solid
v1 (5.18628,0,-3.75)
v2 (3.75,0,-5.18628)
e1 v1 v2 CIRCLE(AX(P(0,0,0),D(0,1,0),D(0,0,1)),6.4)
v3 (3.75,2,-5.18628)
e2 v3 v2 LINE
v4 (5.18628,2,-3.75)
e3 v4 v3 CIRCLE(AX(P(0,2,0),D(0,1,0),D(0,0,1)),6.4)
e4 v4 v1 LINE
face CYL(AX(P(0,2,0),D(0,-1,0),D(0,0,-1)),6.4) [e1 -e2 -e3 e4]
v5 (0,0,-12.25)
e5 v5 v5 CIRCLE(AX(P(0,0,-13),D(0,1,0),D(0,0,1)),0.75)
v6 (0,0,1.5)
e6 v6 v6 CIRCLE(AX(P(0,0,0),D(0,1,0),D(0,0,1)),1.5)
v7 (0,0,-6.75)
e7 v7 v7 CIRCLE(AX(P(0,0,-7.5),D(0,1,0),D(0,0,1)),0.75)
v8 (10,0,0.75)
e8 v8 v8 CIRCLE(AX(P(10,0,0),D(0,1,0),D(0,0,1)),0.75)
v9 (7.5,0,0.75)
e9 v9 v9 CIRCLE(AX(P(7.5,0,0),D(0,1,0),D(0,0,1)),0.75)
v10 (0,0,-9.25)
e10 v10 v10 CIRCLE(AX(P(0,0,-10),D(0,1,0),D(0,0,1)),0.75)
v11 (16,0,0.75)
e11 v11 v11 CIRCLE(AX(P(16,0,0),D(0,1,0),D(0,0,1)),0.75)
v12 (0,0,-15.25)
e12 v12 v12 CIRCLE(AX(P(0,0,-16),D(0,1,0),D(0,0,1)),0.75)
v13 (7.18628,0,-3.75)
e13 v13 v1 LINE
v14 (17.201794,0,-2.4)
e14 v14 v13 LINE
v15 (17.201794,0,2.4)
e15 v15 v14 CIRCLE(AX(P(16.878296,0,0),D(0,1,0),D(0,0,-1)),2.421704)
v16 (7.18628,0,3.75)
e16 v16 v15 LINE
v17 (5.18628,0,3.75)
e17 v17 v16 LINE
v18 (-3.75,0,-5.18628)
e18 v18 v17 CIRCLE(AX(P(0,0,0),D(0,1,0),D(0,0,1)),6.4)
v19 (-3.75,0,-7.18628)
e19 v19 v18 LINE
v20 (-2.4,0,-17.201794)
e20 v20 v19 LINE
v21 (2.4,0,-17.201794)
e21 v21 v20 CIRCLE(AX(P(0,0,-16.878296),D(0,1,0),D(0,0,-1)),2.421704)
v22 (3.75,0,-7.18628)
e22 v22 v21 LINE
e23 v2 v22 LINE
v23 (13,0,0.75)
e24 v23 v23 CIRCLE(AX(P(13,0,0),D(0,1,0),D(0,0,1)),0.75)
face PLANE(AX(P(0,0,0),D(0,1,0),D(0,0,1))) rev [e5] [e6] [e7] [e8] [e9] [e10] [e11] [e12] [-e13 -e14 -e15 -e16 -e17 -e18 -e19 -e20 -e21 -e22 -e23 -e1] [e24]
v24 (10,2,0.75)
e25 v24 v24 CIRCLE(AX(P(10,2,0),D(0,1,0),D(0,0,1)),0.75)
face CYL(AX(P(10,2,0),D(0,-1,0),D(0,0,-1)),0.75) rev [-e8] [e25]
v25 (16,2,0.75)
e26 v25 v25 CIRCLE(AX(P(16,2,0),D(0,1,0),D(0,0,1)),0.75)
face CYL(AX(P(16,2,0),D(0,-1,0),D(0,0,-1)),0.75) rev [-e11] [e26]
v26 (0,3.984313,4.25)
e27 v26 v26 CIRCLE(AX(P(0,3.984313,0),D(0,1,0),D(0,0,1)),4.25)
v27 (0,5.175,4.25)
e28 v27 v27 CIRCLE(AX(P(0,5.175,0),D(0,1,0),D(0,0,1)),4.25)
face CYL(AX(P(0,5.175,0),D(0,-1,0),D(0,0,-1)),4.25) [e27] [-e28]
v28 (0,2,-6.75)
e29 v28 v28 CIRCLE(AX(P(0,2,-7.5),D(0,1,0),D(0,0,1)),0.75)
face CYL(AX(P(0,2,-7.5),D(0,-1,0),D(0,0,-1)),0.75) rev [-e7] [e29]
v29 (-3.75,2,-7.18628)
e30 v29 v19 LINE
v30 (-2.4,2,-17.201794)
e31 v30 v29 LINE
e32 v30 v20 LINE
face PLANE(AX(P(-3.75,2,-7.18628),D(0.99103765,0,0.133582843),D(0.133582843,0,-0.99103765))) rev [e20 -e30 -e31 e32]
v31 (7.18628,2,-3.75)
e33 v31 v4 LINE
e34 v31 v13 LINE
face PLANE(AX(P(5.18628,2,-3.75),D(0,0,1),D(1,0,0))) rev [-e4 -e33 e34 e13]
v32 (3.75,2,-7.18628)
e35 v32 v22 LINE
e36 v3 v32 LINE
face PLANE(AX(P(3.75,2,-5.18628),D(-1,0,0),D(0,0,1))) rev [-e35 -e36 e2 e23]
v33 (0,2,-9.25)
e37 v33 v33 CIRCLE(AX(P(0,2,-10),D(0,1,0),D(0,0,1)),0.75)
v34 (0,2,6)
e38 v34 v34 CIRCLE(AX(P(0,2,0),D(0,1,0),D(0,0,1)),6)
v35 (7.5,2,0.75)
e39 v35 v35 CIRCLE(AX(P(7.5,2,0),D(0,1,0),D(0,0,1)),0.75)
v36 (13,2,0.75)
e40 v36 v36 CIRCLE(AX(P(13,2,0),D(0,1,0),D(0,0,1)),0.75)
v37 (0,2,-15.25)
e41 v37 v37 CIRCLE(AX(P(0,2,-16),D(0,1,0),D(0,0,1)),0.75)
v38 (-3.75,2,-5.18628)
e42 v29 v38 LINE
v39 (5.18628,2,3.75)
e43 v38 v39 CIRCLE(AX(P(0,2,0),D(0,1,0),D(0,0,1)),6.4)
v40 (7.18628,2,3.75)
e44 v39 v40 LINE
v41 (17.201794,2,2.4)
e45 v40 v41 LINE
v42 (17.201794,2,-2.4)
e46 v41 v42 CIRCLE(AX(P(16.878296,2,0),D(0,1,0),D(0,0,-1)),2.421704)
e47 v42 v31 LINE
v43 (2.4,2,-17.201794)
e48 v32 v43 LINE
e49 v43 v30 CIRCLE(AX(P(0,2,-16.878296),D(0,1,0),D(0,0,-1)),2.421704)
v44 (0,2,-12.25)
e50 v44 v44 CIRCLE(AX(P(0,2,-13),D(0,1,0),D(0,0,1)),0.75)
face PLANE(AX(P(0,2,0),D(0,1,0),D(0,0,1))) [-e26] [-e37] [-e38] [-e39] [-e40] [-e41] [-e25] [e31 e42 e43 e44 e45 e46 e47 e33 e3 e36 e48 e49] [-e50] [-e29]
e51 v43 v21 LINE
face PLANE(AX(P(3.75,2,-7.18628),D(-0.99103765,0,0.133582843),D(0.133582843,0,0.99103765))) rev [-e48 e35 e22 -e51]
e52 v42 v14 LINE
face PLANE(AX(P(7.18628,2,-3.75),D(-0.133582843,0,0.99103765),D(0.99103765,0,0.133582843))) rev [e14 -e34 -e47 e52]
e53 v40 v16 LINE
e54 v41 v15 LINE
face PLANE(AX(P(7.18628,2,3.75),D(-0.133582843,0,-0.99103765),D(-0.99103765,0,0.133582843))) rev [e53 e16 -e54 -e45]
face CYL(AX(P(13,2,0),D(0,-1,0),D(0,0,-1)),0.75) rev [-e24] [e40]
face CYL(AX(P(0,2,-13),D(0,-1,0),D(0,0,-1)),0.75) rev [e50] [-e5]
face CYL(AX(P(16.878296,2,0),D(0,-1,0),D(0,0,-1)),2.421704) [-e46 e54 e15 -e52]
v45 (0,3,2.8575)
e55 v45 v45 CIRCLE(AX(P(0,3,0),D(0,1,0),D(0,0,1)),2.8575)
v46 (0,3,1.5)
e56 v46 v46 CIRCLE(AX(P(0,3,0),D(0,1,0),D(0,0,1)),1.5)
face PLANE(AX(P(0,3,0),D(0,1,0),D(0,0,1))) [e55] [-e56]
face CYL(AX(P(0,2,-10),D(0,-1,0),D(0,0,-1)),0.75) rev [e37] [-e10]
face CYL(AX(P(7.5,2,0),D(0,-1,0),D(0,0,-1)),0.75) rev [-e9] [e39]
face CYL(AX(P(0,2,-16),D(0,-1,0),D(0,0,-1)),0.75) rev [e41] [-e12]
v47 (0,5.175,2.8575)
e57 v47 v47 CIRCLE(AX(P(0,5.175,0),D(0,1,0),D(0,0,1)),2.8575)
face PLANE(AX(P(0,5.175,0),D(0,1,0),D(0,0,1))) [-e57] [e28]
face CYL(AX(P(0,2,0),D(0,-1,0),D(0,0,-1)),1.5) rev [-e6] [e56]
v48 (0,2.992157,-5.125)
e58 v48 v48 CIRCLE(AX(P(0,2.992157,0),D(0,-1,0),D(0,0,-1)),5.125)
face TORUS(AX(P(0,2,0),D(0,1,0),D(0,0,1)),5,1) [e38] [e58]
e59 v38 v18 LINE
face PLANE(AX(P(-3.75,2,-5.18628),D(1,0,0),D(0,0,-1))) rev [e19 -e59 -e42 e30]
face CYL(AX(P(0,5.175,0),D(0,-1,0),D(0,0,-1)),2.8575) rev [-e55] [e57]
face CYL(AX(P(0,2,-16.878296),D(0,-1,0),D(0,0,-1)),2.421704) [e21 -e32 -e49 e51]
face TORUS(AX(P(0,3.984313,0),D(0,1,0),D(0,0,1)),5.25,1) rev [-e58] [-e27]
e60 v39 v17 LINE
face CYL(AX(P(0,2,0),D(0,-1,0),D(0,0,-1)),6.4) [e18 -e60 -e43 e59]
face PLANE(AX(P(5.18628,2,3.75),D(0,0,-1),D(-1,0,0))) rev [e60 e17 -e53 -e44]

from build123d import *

# Parameters (mm, degrees)
SKETCH1_R           = 1.5
SKETCH1_R_2         = 0.75
BOSS_EXTRUDE1_DEPTH = 2
SKETCH4_R           = 4.25
SKETCH4_R_2         = 2.8575
BOSS_EXTRUDE2_DEPTH = 3.175
SKETCH5_R           = 6
BOSS_EXTRUDE3_DEPTH = 1
FILLET1_R           = 1
FILLET2_R           = 1
SKETCH7_R           = 1.5
CUT_EXTRUDE1_DEPTH  = 28.780580016


with BuildPart() as part:
    # Sketch1 → Boss-Extrude1 (new body)
    with BuildSketch(Plane(origin=(0, 0, 0), x_dir=(1, 0, 0), z_dir=(0, 1, 0))):
        with BuildLine():
            Line((-3.75, 5.186279977), (-3.75, 7.186279977))
            Line((-3.75, 7.186279977), (-2.4, 17.201793966))
            ThreePointArc((-2.4, 17.201793966), (0, 19.3), (2.4, 17.201793966))
            Line((2.4, 17.201793966), (3.75, 7.186279977))
            Line((3.75, 7.186279977), (3.75, 5.186279977))
            ThreePointArc((3.75, 5.186279977), (4.5254834, 4.5254834), (5.186279977, 3.75))
            Line((5.186279977, 3.75), (7.186279977, 3.75))
            Line((7.186279977, 3.75), (17.201793966, 2.4))
            ThreePointArc((17.201793966, 2.4), (19.3, 0), (17.201793966, -2.4))
            Line((17.201793966, -2.4), (7.186279977, -3.75))
            Line((7.186279977, -3.75), (5.186279977, -3.75))
            ThreePointArc((5.186279977, -3.75), (-4.5254834, -4.5254834), (-3.75, 5.186279977))
        make_face()
        with Locations(Location((0, 0, 0), (0, 0, 270))):
            Circle(SKETCH1_R, mode=Mode.SUBTRACT)
        with Locations(Location((0, 16, 0), (0, 0, 270))):
            Circle(SKETCH1_R_2, mode=Mode.SUBTRACT)
        with Locations(Location((0, 13, 0), (0, 0, 270))):
            Circle(SKETCH1_R_2, mode=Mode.SUBTRACT)
        with Locations(Location((0, 10, 0), (0, 0, 270))):
            Circle(SKETCH1_R_2, mode=Mode.SUBTRACT)
        with Locations(Location((0, 7.5, 0), (0, 0, 270))):
            Circle(SKETCH1_R_2, mode=Mode.SUBTRACT)
        with Locations(Location((7.5, 0, 0), (0, 0, 270))):
            Circle(SKETCH1_R_2, mode=Mode.SUBTRACT)
        with Locations(Location((10, 0, 0), (0, 0, 270))):
            Circle(SKETCH1_R_2, mode=Mode.SUBTRACT)
        with Locations(Location((13, 0, 0), (0, 0, 270))):
            Circle(SKETCH1_R_2, mode=Mode.SUBTRACT)
        with Locations(Location((16, 0, 0), (0, 0, 270))):
            Circle(SKETCH1_R_2, mode=Mode.SUBTRACT)
    extrude(amount=BOSS_EXTRUDE1_DEPTH)

    # Sketch4 → Boss-Extrude2 (add)
    with BuildSketch(Plane(origin=(0, 2, 0), x_dir=(1, 0, 0), z_dir=(0, 1, 0))):
        with Locations(Location((0, 0, 0), (0, 0, 270))):
            Circle(SKETCH4_R)
        with Locations(Location((0, 0, 0), (0, 0, 270))):
            Circle(SKETCH4_R_2, mode=Mode.SUBTRACT)
    extrude(amount=BOSS_EXTRUDE2_DEPTH)

    # Sketch5 → Boss-Extrude3 (add)
    with BuildSketch(Plane(origin=(0, 2, 0), x_dir=(1, 0, 0), z_dir=(0, 1, 0))):
        with Locations(Location((0, 0, 0), (0, 0, 270))):
            Circle(SKETCH5_R)
    extrude(amount=BOSS_EXTRUDE3_DEPTH)

    # Fillet1
    fillet1_edges = [part.edges().sort_by_distance(p)[0] for p in [
        (0, 3, -6),
    ]]
    fillet(fillet1_edges, radius=FILLET1_R - 0.0001)  # a hair under: the kernel refuses the full size

    # Fillet2
    fillet2_edges = [part.edges().sort_by_distance(p)[0] for p in [
        (0, 3, -4.25),
    ]]
    fillet(fillet2_edges, radius=FILLET2_R)

    # Sketch7 → Cut-Extrude1 (cut, through all)
    with BuildSketch(Plane.XZ):
        with Locations(Location((0, 0, 0), (0, 0, 90))):
            Circle(SKETCH7_R)
    extrude(amount=-CUT_EXTRUDE1_DEPTH, mode=Mode.SUBTRACT)


solid = part.part
